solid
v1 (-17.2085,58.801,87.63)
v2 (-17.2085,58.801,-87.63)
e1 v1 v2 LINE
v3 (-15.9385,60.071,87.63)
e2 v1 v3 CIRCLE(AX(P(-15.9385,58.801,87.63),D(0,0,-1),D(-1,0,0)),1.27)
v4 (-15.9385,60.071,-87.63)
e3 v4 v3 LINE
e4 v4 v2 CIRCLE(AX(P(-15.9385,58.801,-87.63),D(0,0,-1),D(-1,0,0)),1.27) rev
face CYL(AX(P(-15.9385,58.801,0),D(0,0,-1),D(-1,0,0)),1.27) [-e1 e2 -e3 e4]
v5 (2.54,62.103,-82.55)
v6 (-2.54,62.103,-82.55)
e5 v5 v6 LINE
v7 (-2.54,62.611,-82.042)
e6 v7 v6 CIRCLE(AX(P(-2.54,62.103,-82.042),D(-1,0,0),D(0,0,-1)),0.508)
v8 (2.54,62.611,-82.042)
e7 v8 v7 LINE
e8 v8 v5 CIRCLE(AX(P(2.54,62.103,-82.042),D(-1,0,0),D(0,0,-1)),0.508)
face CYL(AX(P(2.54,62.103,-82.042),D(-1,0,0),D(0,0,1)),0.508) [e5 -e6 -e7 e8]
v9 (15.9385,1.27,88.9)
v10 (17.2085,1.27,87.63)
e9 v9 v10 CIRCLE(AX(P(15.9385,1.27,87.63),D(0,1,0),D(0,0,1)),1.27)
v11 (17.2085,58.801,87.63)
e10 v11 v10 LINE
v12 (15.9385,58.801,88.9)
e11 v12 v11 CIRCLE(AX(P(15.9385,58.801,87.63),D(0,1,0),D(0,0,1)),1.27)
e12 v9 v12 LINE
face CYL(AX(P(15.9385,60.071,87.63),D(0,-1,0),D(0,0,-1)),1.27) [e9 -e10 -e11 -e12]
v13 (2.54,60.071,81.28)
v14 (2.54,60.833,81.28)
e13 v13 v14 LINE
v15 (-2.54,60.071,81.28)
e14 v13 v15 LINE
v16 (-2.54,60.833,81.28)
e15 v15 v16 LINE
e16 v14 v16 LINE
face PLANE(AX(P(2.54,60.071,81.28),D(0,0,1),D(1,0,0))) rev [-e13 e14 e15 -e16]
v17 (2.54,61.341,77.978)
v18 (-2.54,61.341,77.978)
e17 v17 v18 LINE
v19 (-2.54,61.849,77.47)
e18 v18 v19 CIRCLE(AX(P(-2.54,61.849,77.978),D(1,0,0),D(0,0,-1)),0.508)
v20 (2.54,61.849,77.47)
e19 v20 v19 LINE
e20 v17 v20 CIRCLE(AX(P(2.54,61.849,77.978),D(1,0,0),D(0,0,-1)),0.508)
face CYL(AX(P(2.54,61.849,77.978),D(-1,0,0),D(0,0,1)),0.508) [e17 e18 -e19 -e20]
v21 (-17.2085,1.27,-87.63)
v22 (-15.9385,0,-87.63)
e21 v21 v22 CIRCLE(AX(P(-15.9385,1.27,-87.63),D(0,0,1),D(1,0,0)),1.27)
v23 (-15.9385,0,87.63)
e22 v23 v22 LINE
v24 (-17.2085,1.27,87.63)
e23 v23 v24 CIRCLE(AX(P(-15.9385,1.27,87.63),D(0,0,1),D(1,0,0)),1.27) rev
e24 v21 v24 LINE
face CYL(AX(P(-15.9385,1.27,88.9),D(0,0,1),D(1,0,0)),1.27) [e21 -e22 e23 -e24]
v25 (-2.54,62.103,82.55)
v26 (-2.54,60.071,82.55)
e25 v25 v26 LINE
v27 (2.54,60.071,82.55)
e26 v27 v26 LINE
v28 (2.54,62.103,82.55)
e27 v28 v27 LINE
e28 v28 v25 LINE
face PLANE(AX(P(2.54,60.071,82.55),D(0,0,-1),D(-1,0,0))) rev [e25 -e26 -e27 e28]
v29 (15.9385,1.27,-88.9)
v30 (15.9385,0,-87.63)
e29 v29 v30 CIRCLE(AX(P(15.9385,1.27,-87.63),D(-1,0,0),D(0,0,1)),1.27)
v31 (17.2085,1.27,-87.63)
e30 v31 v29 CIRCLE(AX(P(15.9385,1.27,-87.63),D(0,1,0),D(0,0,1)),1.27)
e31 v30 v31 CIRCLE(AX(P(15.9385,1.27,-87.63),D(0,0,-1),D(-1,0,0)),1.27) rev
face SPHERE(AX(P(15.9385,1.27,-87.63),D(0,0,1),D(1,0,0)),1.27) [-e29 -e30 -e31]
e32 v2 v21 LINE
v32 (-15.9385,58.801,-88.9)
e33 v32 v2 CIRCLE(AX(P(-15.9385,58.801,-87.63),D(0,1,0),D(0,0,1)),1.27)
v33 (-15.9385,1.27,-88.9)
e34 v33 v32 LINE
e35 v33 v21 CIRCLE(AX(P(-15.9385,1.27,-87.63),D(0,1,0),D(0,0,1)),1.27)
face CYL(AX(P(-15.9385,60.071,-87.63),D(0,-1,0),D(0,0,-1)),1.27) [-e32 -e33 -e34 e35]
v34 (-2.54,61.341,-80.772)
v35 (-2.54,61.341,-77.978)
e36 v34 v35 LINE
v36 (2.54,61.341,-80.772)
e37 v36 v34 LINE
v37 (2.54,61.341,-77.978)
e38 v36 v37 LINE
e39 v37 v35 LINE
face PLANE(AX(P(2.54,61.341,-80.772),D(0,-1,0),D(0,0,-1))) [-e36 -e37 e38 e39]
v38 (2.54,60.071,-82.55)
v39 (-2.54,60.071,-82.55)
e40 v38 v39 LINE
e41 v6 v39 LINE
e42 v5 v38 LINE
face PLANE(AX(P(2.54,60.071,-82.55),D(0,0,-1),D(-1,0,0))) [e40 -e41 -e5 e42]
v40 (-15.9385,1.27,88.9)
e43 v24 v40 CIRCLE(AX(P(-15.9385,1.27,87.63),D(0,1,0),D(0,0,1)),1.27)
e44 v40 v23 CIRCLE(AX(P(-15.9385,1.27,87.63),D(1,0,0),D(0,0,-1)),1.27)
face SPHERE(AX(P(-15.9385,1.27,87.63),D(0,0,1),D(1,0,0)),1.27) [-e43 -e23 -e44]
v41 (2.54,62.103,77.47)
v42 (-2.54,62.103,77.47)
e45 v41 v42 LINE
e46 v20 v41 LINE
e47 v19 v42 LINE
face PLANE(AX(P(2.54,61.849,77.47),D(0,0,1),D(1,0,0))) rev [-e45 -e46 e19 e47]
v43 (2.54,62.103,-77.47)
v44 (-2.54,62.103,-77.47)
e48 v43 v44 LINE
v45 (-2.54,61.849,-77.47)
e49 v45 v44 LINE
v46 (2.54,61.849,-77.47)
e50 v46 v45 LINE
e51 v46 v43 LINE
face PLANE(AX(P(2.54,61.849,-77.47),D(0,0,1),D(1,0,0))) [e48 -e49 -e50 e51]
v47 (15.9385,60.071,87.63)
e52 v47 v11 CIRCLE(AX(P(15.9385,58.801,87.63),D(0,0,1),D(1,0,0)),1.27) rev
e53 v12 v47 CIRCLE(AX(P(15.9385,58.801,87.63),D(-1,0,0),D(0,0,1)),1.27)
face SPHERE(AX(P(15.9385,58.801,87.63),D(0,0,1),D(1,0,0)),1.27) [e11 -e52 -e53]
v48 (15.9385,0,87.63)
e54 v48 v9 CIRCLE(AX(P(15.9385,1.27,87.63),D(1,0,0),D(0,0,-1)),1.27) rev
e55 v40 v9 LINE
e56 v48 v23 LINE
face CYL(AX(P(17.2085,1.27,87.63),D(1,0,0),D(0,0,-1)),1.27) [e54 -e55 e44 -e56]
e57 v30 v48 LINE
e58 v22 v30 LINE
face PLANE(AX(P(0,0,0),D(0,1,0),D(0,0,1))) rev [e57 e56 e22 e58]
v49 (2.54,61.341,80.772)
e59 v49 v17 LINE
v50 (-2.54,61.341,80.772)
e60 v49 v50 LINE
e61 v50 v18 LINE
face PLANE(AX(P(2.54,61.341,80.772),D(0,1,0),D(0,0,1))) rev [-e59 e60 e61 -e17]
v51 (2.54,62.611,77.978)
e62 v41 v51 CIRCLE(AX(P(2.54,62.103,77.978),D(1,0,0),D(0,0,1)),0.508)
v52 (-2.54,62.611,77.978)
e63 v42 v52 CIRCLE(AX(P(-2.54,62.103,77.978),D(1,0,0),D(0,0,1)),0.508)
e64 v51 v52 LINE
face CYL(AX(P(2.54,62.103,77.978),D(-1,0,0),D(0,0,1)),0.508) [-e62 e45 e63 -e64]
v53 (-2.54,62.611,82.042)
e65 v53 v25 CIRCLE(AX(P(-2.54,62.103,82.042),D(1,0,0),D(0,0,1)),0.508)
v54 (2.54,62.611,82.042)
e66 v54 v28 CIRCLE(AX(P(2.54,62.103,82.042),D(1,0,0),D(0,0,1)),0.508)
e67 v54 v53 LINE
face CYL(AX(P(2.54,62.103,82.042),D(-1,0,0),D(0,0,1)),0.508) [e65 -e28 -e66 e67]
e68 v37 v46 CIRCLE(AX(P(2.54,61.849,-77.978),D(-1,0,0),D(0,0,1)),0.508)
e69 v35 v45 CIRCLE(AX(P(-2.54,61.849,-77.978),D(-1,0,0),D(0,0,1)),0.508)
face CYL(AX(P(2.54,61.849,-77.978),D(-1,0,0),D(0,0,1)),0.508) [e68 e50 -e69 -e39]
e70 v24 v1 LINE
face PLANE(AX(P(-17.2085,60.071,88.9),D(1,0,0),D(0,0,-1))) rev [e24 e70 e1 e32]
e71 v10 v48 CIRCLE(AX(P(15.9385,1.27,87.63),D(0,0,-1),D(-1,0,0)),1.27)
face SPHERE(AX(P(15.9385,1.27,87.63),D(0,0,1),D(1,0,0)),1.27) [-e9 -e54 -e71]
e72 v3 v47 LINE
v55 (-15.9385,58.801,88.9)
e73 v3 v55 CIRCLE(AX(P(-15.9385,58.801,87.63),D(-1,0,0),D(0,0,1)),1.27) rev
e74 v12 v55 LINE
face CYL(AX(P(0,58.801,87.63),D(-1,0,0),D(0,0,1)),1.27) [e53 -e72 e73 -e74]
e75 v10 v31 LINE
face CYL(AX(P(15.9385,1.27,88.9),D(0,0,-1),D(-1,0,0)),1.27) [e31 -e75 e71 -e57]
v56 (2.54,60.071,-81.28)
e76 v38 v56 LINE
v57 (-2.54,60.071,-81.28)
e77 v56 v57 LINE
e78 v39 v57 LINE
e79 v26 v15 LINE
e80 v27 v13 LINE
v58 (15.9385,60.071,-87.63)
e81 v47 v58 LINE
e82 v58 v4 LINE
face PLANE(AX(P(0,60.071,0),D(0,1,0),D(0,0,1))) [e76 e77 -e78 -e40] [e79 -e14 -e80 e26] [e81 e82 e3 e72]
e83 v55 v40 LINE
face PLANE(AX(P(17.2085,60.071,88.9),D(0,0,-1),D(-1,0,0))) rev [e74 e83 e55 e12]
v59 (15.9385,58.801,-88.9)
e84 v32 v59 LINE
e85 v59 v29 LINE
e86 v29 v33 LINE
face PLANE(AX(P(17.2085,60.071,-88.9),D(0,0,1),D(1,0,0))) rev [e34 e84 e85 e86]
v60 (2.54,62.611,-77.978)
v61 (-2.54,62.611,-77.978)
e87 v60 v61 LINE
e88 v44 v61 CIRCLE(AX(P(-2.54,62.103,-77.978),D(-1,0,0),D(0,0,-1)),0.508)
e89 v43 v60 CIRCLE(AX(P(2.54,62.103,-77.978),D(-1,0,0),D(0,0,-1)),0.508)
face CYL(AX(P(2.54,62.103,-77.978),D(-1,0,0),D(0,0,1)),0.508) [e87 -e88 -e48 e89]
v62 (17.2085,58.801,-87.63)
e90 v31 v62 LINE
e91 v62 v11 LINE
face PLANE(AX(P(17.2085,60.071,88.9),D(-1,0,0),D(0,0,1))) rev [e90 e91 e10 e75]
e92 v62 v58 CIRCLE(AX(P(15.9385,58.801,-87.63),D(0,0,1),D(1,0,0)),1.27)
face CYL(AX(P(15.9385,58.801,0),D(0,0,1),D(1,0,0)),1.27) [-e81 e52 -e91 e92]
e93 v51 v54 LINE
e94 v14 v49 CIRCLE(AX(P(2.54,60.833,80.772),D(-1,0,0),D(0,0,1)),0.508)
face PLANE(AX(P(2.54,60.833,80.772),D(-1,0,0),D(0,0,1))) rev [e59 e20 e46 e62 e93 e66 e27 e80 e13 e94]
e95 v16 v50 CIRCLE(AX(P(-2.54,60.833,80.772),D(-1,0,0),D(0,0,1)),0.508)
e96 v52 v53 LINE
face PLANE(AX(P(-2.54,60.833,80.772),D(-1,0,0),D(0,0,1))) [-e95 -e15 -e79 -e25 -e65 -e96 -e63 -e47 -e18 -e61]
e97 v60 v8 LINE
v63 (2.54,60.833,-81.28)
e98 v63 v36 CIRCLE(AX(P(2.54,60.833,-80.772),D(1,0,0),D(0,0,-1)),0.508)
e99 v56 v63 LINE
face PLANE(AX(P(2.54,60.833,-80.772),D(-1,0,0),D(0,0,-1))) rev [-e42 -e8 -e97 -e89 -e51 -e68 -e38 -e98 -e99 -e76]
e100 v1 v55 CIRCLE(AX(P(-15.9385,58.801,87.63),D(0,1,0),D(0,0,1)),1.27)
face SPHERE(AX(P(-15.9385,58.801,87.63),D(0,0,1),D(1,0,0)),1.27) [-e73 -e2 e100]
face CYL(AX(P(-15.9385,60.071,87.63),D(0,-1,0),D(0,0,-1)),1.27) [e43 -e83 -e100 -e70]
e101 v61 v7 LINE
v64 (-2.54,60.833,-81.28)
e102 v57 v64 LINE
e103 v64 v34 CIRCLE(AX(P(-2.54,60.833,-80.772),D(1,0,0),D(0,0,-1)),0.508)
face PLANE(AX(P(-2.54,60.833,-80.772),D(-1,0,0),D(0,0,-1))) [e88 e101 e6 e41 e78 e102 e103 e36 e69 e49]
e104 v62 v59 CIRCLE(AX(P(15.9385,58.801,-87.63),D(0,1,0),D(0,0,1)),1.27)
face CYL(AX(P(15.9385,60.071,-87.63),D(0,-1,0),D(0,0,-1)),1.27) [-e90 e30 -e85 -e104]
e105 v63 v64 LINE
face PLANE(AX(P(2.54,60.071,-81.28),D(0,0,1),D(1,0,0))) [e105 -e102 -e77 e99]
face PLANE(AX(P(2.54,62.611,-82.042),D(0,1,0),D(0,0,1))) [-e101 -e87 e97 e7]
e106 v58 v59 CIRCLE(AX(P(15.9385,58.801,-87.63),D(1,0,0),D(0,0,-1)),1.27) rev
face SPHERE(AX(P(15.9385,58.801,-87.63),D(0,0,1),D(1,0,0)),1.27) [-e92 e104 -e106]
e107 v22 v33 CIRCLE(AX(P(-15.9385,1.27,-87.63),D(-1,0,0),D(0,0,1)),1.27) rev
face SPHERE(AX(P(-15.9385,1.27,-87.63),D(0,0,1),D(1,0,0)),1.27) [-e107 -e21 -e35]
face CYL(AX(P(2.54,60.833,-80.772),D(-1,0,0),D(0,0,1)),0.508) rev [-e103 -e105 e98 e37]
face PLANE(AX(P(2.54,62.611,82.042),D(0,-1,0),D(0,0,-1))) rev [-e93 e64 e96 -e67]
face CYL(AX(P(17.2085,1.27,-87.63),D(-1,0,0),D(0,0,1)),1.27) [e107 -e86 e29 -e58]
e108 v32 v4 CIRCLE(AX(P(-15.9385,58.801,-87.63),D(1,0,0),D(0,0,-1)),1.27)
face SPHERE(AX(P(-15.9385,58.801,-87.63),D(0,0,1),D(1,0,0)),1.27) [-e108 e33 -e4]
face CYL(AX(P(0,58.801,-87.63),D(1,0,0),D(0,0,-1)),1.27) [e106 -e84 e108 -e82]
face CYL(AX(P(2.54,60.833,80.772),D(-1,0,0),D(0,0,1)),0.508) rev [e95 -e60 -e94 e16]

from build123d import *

# Parameters (mm, degrees)
SKETCH1_W           = 34.417
SKETCH1_H           = 177.8
BOSS_EXTRUDE1_DEPTH = 60.071
FILLET1_R           = 1.27
FILLET2_R           = 1.27
BOSS_EXTRUDE2_DEPTH = 2.54


with BuildPart() as part:
    # Sketch1 → Boss-Extrude1 (new body)
    with BuildSketch(Plane(origin=(0, 0, 0), x_dir=(1, 0, 0), z_dir=(0, 1, 0))):
        Rectangle(SKETCH1_W, SKETCH1_H)
    extrude(amount=BOSS_EXTRUDE1_DEPTH)

    # Fillet1
    fillet1_edges = [part.edges().sort_by_distance(p)[0] for p in [
        (17.2085, 60.071, 0),
        (0, 60.071, -88.9),
        (-17.2085, 60.071, 0),
        (0, 0, -88.9),
        (17.2085, 0, 0),
        (0, 0, 88.9),
        (-17.2085, 0, 0),
        (0, 60.071, 88.9),
    ]]
    fillet(fillet1_edges, radius=FILLET1_R)

    # Fillet2
    # the kernel refuses this fillet: 1.27 mm, written as the material it takes off along each edge
    with BuildSketch(Plane(origin=(-15.9385, 1.27, -87.63), x_dir=(0, 0, -1), z_dir=(-1, 0, 0))) as fillet2_piece_1_section:
        Polygon((0, 0), (FILLET2_R * 1.02, 0), (FILLET2_R * 1.02, FILLET2_R * 1.02), (0, FILLET2_R * 1.02), align=None)
    fillet2_piece_1 = extrude(amount=FILLET2_R * 1.02, mode=Mode.PRIVATE)
    fillet2_piece_1 = fillet2_piece_1 - Plane(origin=(-15.9385, 1.27, -87.63), x_dir=(0, 0.7071067811865475, 0.7071067811865475), z_dir=(-1, 0, 0)) * Sphere(FILLET2_R, mode=Mode.PRIVATE)
    add(fillet2_piece_1, mode=Mode.SUBTRACT)
    with BuildSketch(Plane(origin=(15.9385, 1.27, -87.63), x_dir=(0, 0, -1), z_dir=(1, 0, 0))) as fillet2_piece_2_section:
        Polygon((0, 0), (FILLET2_R * 1.02, 0), (FILLET2_R * 1.02, -FILLET2_R * 1.02), (0, -FILLET2_R * 1.02), align=None)
    fillet2_piece_2 = extrude(amount=FILLET2_R * 1.02, mode=Mode.PRIVATE)
    fillet2_piece_2 = fillet2_piece_2 - Plane(origin=(15.9385, 1.27, -87.63), x_dir=(0, 0.7071067811865475, 0.7071067811865475), z_dir=(1, 0, 0)) * Sphere(FILLET2_R, mode=Mode.PRIVATE)
    add(fillet2_piece_2, mode=Mode.SUBTRACT)
    with BuildSketch(Plane(origin=(-15.9385, 1.27, 87.63), x_dir=(-1, 0, 0), z_dir=(0, 0, 1))) as fillet2_piece_3_section:
        Polygon((0, 0), (FILLET2_R * 1.02, 0), (FILLET2_R * 1.02, FILLET2_R * 1.02), (0, FILLET2_R * 1.02), align=None)
    fillet2_piece_3 = extrude(amount=FILLET2_R * 1.02, mode=Mode.PRIVATE)
    fillet2_piece_3 = fillet2_piece_3 - Plane(origin=(-15.9385, 1.27, 87.63), x_dir=(0.7071067811865475, 0.7071067811865475, 0), z_dir=(0, 0, 1)) * Sphere(FILLET2_R, mode=Mode.PRIVATE)
    add(fillet2_piece_3, mode=Mode.SUBTRACT)
    with BuildSketch(Plane(origin=(15.9385, 1.27, 87.63), x_dir=(1, 0, 0), z_dir=(0, 0, 1))) as fillet2_piece_4_section:
        Polygon((0, 0), (FILLET2_R * 1.02, 0), (FILLET2_R * 1.02, -FILLET2_R * 1.02), (0, -FILLET2_R * 1.02), align=None)
    fillet2_piece_4 = extrude(amount=FILLET2_R * 1.02, mode=Mode.PRIVATE)
    fillet2_piece_4 = fillet2_piece_4 - Plane(origin=(15.9385, 1.27, 87.63), x_dir=(-0.7071067811865475, 0.7071067811865475, 0), z_dir=(0, 0, 1)) * Sphere(FILLET2_R, mode=Mode.PRIVATE)
    add(fillet2_piece_4, mode=Mode.SUBTRACT)
    with BuildSketch(Plane(origin=(15.9385, 58.801, 87.63), x_dir=(1, 0, 0), z_dir=(0, 0, 1))) as fillet2_piece_5_section:
        Polygon((0, 0), (FILLET2_R * 1.02, 0), (FILLET2_R * 1.02, FILLET2_R * 1.02), (0, FILLET2_R * 1.02), align=None)
    fillet2_piece_5 = extrude(amount=FILLET2_R * 1.02, mode=Mode.PRIVATE)
    fillet2_piece_5 = fillet2_piece_5 - Plane(origin=(15.9385, 58.801, 87.63), x_dir=(-0.7071067811865475, -0.7071067811865475, 0), z_dir=(0, 0, 1)) * Sphere(FILLET2_R, mode=Mode.PRIVATE)
    add(fillet2_piece_5, mode=Mode.SUBTRACT)
    with BuildSketch(Plane(origin=(-15.9385, 58.801, 87.63), x_dir=(-1, 0, 0), z_dir=(0, 0, 1))) as fillet2_piece_6_section:
        Polygon((0, 0), (FILLET2_R * 1.02, 0), (FILLET2_R * 1.02, -FILLET2_R * 1.02), (0, -FILLET2_R * 1.02), align=None)
    fillet2_piece_6 = extrude(amount=FILLET2_R * 1.02, mode=Mode.PRIVATE)
    fillet2_piece_6 = fillet2_piece_6 - Plane(origin=(-15.9385, 58.801, 87.63), x_dir=(0.7071067811865475, -0.7071067811865475, 0), z_dir=(0, 0, 1)) * Sphere(FILLET2_R, mode=Mode.PRIVATE)
    add(fillet2_piece_6, mode=Mode.SUBTRACT)
    with BuildSketch(Plane(origin=(15.9385, 58.801, -87.63), x_dir=(0, 0, -1), z_dir=(1, 0, 0))) as fillet2_piece_7_section:
        Polygon((0, 0), (FILLET2_R * 1.02, 0), (FILLET2_R * 1.02, FILLET2_R * 1.02), (0, FILLET2_R * 1.02), align=None)
    fillet2_piece_7 = extrude(amount=FILLET2_R * 1.02, mode=Mode.PRIVATE)
    fillet2_piece_7 = fillet2_piece_7 - Plane(origin=(15.9385, 58.801, -87.63), x_dir=(0, -0.7071067811865475, 0.7071067811865475), z_dir=(1, 0, 0)) * Sphere(FILLET2_R, mode=Mode.PRIVATE)
    add(fillet2_piece_7, mode=Mode.SUBTRACT)
    with BuildSketch(Plane(origin=(-15.9385, 58.801, -87.63), x_dir=(0, 0, -1), z_dir=(-1, 0, 0))) as fillet2_piece_8_section:
        Polygon((0, 0), (FILLET2_R * 1.02, 0), (FILLET2_R * 1.02, -FILLET2_R * 1.02), (0, -FILLET2_R * 1.02), align=None)
    fillet2_piece_8 = extrude(amount=FILLET2_R * 1.02, mode=Mode.PRIVATE)
    fillet2_piece_8 = fillet2_piece_8 - Plane(origin=(-15.9385, 58.801, -87.63), x_dir=(0, -0.7071067811865475, 0.7071067811865475), z_dir=(-1, 0, 0)) * Sphere(FILLET2_R, mode=Mode.PRIVATE)
    add(fillet2_piece_8, mode=Mode.SUBTRACT)
    with BuildSketch(Plane(origin=(17.2085, 1.27, 88.9), x_dir=(-1, 0, 0), z_dir=(0, 1, 0)), Plane(origin=(17.2085, 1.27, -88.9), x_dir=(0, 0, 1), z_dir=(0, 1, 0))) as fillet2_piece_9:
        with BuildLine():
            CenterArc((FILLET2_R, -FILLET2_R), FILLET2_R, 90, 90)
            Line((0, -FILLET2_R), (0, 0))
            Line((0, 0), (FILLET2_R, 0))
        make_face()
    extrude(amount=57.531, mode=Mode.SUBTRACT)
    with BuildSketch(Plane(origin=(-17.2085, 1.27, 88.9), x_dir=(1, 0, 0), z_dir=(0, 1, 0)), Plane(origin=(-17.2085, 1.27, -88.9), x_dir=(0, 0, 1), z_dir=(0, 1, 0))) as fillet2_piece_10:
        with BuildLine():
            CenterArc((FILLET2_R, FILLET2_R), FILLET2_R, 180, 90)
            Line((0, FILLET2_R), (0, 0))
            Line((0, 0), (FILLET2_R, 0))
        make_face()
    extrude(amount=57.531, mode=Mode.SUBTRACT)

    # Sketch2 → Boss-Extrude2 (add, symmetric)
    with BuildSketch(Plane(origin=(0, 0, 0), x_dir=(0, 0, -1), z_dir=(1, 0, 0))):
        with BuildLine():
            Line((-82.55, 60.071), (-82.55, 62.103))
            ThreePointArc((-82.55, 62.103), (-82.401210245, 62.462210245), (-82.042, 62.611))
            Line((-82.042, 62.611), (-77.978, 62.611))
            ThreePointArc((-77.978, 62.611), (-77.618789755, 62.462210245), (-77.47, 62.103))
            Line((-77.47, 62.103), (-77.47, 61.849))
            ThreePointArc((-77.47, 61.849), (-77.618789755, 61.489789755), (-77.978, 61.341))
            Line((-77.978, 61.341), (-80.772, 61.341))
            ThreePointArc((-80.772, 61.341), (-81.131210245, 61.192210245), (-81.28, 60.833))
            Line((-81.28, 60.833), (-81.28, 60.071))
            Line((-81.28, 60.071), (-82.55, 60.071))
        make_face()
    boss_extrude2 = extrude(amount=BOSS_EXTRUDE2_DEPTH, both=True)

    # Mirror1: Boss-Extrude2 across plane
    add(boss_extrude2.mirror(Plane.XY))


solid = part.part
